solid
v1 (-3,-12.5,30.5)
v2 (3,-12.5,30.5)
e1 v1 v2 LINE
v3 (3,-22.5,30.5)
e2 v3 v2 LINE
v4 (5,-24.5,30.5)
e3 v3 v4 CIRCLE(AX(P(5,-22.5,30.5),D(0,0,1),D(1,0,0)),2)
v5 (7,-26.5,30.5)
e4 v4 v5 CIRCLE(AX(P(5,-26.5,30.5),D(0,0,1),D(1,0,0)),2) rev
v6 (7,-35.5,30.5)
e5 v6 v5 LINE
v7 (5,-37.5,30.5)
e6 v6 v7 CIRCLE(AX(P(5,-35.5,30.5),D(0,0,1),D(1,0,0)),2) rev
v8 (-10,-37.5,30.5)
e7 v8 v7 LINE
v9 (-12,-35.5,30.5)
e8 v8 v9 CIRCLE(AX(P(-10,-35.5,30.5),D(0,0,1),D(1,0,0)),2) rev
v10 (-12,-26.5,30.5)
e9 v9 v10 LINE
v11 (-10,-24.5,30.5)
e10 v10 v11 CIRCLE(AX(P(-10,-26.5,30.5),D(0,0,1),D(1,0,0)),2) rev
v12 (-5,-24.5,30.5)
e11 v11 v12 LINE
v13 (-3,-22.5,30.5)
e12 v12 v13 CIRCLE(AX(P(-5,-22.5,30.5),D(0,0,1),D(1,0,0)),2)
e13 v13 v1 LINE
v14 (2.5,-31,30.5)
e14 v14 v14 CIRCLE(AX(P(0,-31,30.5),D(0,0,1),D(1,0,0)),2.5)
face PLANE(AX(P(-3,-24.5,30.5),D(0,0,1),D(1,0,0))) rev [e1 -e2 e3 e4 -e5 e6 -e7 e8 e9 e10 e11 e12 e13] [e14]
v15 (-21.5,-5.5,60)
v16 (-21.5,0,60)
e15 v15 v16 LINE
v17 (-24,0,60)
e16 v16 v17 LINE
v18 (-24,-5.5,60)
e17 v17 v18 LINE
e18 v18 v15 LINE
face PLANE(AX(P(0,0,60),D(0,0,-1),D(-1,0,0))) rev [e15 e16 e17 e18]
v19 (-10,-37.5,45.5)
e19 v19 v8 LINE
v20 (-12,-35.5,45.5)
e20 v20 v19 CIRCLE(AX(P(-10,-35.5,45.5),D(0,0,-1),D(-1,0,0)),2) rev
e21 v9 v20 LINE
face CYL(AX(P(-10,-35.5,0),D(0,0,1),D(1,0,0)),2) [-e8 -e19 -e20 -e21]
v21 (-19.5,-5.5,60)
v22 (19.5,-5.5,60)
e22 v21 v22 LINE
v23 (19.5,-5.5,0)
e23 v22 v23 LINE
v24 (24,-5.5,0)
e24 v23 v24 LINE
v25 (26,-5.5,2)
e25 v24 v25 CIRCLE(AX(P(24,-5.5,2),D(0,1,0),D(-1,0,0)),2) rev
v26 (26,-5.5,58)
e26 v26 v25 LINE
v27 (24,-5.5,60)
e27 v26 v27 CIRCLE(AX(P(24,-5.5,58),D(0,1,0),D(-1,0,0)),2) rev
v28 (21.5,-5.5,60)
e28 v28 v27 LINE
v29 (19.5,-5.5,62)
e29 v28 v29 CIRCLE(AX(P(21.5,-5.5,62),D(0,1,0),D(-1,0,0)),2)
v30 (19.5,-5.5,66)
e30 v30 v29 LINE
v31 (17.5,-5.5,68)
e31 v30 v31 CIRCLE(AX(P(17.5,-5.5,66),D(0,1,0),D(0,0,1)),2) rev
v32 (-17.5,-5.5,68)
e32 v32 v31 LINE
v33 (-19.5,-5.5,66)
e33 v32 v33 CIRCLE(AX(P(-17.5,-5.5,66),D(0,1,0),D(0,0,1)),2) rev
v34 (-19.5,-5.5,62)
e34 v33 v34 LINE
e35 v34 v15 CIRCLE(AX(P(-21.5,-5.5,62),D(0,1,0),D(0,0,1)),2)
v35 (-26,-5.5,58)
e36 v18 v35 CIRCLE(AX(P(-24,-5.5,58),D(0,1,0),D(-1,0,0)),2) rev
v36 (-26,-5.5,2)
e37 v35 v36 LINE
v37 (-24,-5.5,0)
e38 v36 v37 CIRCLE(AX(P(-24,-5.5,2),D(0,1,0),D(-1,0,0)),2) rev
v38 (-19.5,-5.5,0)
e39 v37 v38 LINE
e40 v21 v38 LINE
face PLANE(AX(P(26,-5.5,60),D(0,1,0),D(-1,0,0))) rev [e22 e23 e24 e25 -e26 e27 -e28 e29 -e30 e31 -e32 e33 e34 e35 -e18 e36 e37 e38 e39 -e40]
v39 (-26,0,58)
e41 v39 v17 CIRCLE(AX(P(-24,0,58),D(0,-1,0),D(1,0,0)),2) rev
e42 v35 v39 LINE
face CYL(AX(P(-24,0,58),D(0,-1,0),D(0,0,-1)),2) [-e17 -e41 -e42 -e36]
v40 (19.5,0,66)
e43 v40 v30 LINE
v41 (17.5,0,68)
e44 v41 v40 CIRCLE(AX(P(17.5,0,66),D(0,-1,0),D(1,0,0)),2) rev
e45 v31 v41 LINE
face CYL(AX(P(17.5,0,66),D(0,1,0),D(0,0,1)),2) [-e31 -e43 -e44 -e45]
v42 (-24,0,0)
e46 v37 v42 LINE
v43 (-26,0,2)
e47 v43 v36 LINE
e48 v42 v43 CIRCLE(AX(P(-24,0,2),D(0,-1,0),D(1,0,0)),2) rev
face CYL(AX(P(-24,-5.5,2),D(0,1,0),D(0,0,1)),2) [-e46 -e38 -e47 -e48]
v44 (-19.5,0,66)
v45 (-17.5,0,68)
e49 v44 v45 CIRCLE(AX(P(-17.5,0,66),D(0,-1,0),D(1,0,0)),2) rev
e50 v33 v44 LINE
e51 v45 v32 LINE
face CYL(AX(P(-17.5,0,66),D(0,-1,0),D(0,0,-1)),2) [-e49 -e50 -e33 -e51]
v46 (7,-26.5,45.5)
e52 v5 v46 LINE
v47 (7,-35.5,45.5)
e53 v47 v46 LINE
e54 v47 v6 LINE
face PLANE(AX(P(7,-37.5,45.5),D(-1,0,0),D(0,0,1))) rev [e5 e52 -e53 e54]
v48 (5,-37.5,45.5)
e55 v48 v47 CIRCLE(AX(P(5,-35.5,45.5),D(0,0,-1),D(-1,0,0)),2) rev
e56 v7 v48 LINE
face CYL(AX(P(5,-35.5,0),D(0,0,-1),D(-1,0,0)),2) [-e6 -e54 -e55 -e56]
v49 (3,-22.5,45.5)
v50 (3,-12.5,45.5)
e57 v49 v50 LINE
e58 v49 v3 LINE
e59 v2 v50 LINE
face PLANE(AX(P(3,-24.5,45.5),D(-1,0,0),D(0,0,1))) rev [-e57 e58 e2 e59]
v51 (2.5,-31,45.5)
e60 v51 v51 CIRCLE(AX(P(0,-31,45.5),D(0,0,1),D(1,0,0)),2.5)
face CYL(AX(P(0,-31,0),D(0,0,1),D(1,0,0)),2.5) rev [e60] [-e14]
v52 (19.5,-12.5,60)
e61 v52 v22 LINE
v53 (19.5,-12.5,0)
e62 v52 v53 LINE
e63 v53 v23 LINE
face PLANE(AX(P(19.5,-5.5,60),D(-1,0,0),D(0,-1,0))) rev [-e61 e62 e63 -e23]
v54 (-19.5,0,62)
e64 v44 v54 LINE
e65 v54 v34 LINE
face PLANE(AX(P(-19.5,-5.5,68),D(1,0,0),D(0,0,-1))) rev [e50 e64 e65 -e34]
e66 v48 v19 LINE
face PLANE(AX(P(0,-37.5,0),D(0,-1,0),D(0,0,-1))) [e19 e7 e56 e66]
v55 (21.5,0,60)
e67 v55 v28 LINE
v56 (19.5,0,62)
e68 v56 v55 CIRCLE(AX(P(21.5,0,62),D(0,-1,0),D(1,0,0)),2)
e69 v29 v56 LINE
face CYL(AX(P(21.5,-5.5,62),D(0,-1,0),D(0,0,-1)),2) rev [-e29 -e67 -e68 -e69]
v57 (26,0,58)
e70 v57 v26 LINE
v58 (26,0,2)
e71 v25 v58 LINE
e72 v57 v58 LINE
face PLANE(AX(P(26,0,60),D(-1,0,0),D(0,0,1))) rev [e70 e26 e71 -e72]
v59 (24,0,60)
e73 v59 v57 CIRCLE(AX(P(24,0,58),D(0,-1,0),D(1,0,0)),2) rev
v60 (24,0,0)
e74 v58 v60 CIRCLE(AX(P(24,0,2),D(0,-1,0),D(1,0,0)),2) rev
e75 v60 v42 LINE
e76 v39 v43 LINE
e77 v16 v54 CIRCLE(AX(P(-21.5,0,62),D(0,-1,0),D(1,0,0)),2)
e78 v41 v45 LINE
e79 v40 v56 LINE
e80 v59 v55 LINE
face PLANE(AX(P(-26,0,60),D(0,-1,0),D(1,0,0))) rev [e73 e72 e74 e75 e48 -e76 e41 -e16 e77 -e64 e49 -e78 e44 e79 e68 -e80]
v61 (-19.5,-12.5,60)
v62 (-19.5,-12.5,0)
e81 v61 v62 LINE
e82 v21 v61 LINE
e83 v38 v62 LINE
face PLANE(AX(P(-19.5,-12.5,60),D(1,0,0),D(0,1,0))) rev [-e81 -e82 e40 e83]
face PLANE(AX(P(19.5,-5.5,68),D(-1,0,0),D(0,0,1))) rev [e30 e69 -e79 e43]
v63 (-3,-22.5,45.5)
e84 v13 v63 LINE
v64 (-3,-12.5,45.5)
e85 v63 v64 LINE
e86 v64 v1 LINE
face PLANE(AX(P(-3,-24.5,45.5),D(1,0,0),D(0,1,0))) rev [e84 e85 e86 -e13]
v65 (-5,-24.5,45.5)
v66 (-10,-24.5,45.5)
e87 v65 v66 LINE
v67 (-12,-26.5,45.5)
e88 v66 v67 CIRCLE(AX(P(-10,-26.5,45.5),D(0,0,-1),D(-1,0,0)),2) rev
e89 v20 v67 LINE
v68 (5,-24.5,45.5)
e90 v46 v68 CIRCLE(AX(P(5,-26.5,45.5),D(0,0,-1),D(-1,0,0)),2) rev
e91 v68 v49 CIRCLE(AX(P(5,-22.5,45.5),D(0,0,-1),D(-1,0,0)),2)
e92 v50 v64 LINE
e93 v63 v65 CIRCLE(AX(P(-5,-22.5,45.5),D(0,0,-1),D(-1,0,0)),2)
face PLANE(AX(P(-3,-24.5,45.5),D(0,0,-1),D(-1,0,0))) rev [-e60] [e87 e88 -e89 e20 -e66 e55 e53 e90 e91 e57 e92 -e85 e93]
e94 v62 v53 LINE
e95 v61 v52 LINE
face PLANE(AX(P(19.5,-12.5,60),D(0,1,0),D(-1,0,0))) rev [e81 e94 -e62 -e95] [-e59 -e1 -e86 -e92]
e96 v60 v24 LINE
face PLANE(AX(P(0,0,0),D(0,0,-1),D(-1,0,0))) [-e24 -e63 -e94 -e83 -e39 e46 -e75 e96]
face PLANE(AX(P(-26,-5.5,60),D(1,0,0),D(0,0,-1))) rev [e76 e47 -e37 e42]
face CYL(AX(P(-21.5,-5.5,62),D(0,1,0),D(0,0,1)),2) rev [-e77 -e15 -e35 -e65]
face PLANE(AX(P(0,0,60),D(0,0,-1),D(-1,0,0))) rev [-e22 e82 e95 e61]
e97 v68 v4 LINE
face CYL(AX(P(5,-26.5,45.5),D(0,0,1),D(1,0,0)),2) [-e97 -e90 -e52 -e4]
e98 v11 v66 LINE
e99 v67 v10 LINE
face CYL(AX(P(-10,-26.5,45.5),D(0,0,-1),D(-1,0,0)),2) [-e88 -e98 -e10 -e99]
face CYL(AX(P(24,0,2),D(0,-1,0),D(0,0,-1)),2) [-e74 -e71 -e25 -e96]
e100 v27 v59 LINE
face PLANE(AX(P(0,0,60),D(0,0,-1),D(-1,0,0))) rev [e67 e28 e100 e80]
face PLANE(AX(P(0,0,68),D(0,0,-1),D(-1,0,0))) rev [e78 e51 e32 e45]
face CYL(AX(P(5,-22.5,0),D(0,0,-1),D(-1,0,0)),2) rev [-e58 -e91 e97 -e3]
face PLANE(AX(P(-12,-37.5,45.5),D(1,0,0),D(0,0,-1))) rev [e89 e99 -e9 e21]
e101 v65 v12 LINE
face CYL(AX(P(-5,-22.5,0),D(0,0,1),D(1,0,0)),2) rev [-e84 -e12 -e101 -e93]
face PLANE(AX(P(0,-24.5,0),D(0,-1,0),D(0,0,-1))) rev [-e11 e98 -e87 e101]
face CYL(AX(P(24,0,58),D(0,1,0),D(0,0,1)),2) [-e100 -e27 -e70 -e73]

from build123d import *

# Parameters (mm, degrees)
BOSS_EXTRUDE1_DEPTH = 60
SKETCH2_W           = 39
SKETCH2_H           = 5.5
BOSS_EXTRUDE2_DEPTH = 8
FILLET2_R           = 2
SKETCH3_W           = 6
SKETCH3_H           = 15
BOSS_EXTRUDE3_DEPTH = 12
SKETCH4_W           = 19
SKETCH4_H           = 15
BOSS_EXTRUDE4_DEPTH = 13
FILLET3_R           = 2
SKETCH5_R           = 2.5
CUT_EXTRUDE1_DEPTH  = 65.439894475


# Some blends are built 0.0001 mm under size
with BuildPart() as part:
    # Sketch1 → Boss-Extrude1 (new body)
    with BuildSketch(Plane.XY):
        Polygon((-26, 0), (26, 0), (26, -5.5), (19.5, -5.5), (19.5, -12.5), (-19.5, -12.5), (-19.5, -5.5), (-26, -5.5), align=None)
    extrude(amount=BOSS_EXTRUDE1_DEPTH)

    # Sketch2 → Boss-Extrude2 (add)
    with BuildSketch(Plane.XY.offset(60)):
        with Locations((0, -2.75)):
            Rectangle(SKETCH2_W, SKETCH2_H)
    extrude(amount=BOSS_EXTRUDE2_DEPTH)

    # Fillet2
    # the kernel refuses this fillet: 2 mm, written as the material it adds along each edge
    with BuildSketch(Plane(origin=(-19.5, 0, 60), x_dir=(-1, 0, 0), z_dir=(0, -1, 0)), Plane(origin=(19.5, -5.5, 60), x_dir=(1, 0, 0), z_dir=(0, 1, 0))) as fillet2_piece_1:
        with BuildLine():
            CenterArc((FILLET2_R, -FILLET2_R), FILLET2_R, 90, 90)
            Line((0, -FILLET2_R), (0, 0))
            Line((0, 0), (FILLET2_R, 0))
        make_face()
    extrude(amount=5.5)
    # the kernel refuses this fillet: 2 mm, written as the material it takes off along each edge
    with BuildSketch(Plane(origin=(26, 5, 60), x_dir=(-1, 0, 0), z_dir=(0, -1, 0)), Plane(origin=(-19.5, 5, 68), x_dir=(0, 0, -1), z_dir=(0, -1, 0)), Plane(origin=(-26, -10.5, 0), x_dir=(0, 0, 1), z_dir=(0, 1, 0)), Plane(origin=(26, 5, 0), x_dir=(0, 0, 1), z_dir=(0, -1, 0))) as fillet2_2_piece_1:
        with BuildLine():
            CenterArc((FILLET2_R, FILLET2_R), FILLET2_R, 180, 90)
            Line((0, FILLET2_R), (0, 0))
            Line((0, 0), (FILLET2_R, 0))
        make_face()
    extrude(amount=15.5, mode=Mode.SUBTRACT)
    with BuildSketch(Plane(origin=(-26, -10.5, 60), x_dir=(0, 0, -1), z_dir=(0, 1, 0)), Plane(origin=(19.5, -10.5, 68), x_dir=(-1, 0, 0), z_dir=(0, 1, 0))) as fillet2_2_piece_2:
        with BuildLine():
            CenterArc((FILLET2_R, -FILLET2_R), FILLET2_R, 90, 90)
            Line((0, -FILLET2_R), (0, 0))
            Line((0, 0), (FILLET2_R, 0))
        make_face()
    extrude(amount=15.5, mode=Mode.SUBTRACT)

    # Sketch3 → Boss-Extrude3 (add)
    with BuildSketch(Plane.XZ.offset(12.5)):
        with Locations((0, 38)):
            Rectangle(SKETCH3_W, SKETCH3_H)
    extrude(amount=BOSS_EXTRUDE3_DEPTH)

    # Sketch4 → Boss-Extrude4 (add)
    with BuildSketch(Plane.XZ.offset(24.5)):
        with Locations((-2.5, 38)):
            Rectangle(SKETCH4_W, SKETCH4_H)
    extrude(amount=BOSS_EXTRUDE4_DEPTH)

    # Fillet3
    fillet3_edges = [part.edges().sort_by_distance(p)[0] for p in [
        (7, -24.5, 38),
        (-12, -24.5, 38),
        (7, -37.5, 38),
        (-12, -37.5, 38),
        (3, -24.5, 38),
        (-3, -24.5, 38),
    ]]
    fillet(fillet3_edges, radius=FILLET3_R - 0.0001)  # a hair under: the kernel refuses the full size

    # Sketch5 → Cut-Extrude1 (cut, through all)
    with BuildSketch(Plane.XY.offset(45.5)):
        with Locations((0, -31)):
            Circle(SKETCH5_R)
    extrude(amount=-CUT_EXTRUDE1_DEPTH, mode=Mode.SUBTRACT)


solid = part.part
